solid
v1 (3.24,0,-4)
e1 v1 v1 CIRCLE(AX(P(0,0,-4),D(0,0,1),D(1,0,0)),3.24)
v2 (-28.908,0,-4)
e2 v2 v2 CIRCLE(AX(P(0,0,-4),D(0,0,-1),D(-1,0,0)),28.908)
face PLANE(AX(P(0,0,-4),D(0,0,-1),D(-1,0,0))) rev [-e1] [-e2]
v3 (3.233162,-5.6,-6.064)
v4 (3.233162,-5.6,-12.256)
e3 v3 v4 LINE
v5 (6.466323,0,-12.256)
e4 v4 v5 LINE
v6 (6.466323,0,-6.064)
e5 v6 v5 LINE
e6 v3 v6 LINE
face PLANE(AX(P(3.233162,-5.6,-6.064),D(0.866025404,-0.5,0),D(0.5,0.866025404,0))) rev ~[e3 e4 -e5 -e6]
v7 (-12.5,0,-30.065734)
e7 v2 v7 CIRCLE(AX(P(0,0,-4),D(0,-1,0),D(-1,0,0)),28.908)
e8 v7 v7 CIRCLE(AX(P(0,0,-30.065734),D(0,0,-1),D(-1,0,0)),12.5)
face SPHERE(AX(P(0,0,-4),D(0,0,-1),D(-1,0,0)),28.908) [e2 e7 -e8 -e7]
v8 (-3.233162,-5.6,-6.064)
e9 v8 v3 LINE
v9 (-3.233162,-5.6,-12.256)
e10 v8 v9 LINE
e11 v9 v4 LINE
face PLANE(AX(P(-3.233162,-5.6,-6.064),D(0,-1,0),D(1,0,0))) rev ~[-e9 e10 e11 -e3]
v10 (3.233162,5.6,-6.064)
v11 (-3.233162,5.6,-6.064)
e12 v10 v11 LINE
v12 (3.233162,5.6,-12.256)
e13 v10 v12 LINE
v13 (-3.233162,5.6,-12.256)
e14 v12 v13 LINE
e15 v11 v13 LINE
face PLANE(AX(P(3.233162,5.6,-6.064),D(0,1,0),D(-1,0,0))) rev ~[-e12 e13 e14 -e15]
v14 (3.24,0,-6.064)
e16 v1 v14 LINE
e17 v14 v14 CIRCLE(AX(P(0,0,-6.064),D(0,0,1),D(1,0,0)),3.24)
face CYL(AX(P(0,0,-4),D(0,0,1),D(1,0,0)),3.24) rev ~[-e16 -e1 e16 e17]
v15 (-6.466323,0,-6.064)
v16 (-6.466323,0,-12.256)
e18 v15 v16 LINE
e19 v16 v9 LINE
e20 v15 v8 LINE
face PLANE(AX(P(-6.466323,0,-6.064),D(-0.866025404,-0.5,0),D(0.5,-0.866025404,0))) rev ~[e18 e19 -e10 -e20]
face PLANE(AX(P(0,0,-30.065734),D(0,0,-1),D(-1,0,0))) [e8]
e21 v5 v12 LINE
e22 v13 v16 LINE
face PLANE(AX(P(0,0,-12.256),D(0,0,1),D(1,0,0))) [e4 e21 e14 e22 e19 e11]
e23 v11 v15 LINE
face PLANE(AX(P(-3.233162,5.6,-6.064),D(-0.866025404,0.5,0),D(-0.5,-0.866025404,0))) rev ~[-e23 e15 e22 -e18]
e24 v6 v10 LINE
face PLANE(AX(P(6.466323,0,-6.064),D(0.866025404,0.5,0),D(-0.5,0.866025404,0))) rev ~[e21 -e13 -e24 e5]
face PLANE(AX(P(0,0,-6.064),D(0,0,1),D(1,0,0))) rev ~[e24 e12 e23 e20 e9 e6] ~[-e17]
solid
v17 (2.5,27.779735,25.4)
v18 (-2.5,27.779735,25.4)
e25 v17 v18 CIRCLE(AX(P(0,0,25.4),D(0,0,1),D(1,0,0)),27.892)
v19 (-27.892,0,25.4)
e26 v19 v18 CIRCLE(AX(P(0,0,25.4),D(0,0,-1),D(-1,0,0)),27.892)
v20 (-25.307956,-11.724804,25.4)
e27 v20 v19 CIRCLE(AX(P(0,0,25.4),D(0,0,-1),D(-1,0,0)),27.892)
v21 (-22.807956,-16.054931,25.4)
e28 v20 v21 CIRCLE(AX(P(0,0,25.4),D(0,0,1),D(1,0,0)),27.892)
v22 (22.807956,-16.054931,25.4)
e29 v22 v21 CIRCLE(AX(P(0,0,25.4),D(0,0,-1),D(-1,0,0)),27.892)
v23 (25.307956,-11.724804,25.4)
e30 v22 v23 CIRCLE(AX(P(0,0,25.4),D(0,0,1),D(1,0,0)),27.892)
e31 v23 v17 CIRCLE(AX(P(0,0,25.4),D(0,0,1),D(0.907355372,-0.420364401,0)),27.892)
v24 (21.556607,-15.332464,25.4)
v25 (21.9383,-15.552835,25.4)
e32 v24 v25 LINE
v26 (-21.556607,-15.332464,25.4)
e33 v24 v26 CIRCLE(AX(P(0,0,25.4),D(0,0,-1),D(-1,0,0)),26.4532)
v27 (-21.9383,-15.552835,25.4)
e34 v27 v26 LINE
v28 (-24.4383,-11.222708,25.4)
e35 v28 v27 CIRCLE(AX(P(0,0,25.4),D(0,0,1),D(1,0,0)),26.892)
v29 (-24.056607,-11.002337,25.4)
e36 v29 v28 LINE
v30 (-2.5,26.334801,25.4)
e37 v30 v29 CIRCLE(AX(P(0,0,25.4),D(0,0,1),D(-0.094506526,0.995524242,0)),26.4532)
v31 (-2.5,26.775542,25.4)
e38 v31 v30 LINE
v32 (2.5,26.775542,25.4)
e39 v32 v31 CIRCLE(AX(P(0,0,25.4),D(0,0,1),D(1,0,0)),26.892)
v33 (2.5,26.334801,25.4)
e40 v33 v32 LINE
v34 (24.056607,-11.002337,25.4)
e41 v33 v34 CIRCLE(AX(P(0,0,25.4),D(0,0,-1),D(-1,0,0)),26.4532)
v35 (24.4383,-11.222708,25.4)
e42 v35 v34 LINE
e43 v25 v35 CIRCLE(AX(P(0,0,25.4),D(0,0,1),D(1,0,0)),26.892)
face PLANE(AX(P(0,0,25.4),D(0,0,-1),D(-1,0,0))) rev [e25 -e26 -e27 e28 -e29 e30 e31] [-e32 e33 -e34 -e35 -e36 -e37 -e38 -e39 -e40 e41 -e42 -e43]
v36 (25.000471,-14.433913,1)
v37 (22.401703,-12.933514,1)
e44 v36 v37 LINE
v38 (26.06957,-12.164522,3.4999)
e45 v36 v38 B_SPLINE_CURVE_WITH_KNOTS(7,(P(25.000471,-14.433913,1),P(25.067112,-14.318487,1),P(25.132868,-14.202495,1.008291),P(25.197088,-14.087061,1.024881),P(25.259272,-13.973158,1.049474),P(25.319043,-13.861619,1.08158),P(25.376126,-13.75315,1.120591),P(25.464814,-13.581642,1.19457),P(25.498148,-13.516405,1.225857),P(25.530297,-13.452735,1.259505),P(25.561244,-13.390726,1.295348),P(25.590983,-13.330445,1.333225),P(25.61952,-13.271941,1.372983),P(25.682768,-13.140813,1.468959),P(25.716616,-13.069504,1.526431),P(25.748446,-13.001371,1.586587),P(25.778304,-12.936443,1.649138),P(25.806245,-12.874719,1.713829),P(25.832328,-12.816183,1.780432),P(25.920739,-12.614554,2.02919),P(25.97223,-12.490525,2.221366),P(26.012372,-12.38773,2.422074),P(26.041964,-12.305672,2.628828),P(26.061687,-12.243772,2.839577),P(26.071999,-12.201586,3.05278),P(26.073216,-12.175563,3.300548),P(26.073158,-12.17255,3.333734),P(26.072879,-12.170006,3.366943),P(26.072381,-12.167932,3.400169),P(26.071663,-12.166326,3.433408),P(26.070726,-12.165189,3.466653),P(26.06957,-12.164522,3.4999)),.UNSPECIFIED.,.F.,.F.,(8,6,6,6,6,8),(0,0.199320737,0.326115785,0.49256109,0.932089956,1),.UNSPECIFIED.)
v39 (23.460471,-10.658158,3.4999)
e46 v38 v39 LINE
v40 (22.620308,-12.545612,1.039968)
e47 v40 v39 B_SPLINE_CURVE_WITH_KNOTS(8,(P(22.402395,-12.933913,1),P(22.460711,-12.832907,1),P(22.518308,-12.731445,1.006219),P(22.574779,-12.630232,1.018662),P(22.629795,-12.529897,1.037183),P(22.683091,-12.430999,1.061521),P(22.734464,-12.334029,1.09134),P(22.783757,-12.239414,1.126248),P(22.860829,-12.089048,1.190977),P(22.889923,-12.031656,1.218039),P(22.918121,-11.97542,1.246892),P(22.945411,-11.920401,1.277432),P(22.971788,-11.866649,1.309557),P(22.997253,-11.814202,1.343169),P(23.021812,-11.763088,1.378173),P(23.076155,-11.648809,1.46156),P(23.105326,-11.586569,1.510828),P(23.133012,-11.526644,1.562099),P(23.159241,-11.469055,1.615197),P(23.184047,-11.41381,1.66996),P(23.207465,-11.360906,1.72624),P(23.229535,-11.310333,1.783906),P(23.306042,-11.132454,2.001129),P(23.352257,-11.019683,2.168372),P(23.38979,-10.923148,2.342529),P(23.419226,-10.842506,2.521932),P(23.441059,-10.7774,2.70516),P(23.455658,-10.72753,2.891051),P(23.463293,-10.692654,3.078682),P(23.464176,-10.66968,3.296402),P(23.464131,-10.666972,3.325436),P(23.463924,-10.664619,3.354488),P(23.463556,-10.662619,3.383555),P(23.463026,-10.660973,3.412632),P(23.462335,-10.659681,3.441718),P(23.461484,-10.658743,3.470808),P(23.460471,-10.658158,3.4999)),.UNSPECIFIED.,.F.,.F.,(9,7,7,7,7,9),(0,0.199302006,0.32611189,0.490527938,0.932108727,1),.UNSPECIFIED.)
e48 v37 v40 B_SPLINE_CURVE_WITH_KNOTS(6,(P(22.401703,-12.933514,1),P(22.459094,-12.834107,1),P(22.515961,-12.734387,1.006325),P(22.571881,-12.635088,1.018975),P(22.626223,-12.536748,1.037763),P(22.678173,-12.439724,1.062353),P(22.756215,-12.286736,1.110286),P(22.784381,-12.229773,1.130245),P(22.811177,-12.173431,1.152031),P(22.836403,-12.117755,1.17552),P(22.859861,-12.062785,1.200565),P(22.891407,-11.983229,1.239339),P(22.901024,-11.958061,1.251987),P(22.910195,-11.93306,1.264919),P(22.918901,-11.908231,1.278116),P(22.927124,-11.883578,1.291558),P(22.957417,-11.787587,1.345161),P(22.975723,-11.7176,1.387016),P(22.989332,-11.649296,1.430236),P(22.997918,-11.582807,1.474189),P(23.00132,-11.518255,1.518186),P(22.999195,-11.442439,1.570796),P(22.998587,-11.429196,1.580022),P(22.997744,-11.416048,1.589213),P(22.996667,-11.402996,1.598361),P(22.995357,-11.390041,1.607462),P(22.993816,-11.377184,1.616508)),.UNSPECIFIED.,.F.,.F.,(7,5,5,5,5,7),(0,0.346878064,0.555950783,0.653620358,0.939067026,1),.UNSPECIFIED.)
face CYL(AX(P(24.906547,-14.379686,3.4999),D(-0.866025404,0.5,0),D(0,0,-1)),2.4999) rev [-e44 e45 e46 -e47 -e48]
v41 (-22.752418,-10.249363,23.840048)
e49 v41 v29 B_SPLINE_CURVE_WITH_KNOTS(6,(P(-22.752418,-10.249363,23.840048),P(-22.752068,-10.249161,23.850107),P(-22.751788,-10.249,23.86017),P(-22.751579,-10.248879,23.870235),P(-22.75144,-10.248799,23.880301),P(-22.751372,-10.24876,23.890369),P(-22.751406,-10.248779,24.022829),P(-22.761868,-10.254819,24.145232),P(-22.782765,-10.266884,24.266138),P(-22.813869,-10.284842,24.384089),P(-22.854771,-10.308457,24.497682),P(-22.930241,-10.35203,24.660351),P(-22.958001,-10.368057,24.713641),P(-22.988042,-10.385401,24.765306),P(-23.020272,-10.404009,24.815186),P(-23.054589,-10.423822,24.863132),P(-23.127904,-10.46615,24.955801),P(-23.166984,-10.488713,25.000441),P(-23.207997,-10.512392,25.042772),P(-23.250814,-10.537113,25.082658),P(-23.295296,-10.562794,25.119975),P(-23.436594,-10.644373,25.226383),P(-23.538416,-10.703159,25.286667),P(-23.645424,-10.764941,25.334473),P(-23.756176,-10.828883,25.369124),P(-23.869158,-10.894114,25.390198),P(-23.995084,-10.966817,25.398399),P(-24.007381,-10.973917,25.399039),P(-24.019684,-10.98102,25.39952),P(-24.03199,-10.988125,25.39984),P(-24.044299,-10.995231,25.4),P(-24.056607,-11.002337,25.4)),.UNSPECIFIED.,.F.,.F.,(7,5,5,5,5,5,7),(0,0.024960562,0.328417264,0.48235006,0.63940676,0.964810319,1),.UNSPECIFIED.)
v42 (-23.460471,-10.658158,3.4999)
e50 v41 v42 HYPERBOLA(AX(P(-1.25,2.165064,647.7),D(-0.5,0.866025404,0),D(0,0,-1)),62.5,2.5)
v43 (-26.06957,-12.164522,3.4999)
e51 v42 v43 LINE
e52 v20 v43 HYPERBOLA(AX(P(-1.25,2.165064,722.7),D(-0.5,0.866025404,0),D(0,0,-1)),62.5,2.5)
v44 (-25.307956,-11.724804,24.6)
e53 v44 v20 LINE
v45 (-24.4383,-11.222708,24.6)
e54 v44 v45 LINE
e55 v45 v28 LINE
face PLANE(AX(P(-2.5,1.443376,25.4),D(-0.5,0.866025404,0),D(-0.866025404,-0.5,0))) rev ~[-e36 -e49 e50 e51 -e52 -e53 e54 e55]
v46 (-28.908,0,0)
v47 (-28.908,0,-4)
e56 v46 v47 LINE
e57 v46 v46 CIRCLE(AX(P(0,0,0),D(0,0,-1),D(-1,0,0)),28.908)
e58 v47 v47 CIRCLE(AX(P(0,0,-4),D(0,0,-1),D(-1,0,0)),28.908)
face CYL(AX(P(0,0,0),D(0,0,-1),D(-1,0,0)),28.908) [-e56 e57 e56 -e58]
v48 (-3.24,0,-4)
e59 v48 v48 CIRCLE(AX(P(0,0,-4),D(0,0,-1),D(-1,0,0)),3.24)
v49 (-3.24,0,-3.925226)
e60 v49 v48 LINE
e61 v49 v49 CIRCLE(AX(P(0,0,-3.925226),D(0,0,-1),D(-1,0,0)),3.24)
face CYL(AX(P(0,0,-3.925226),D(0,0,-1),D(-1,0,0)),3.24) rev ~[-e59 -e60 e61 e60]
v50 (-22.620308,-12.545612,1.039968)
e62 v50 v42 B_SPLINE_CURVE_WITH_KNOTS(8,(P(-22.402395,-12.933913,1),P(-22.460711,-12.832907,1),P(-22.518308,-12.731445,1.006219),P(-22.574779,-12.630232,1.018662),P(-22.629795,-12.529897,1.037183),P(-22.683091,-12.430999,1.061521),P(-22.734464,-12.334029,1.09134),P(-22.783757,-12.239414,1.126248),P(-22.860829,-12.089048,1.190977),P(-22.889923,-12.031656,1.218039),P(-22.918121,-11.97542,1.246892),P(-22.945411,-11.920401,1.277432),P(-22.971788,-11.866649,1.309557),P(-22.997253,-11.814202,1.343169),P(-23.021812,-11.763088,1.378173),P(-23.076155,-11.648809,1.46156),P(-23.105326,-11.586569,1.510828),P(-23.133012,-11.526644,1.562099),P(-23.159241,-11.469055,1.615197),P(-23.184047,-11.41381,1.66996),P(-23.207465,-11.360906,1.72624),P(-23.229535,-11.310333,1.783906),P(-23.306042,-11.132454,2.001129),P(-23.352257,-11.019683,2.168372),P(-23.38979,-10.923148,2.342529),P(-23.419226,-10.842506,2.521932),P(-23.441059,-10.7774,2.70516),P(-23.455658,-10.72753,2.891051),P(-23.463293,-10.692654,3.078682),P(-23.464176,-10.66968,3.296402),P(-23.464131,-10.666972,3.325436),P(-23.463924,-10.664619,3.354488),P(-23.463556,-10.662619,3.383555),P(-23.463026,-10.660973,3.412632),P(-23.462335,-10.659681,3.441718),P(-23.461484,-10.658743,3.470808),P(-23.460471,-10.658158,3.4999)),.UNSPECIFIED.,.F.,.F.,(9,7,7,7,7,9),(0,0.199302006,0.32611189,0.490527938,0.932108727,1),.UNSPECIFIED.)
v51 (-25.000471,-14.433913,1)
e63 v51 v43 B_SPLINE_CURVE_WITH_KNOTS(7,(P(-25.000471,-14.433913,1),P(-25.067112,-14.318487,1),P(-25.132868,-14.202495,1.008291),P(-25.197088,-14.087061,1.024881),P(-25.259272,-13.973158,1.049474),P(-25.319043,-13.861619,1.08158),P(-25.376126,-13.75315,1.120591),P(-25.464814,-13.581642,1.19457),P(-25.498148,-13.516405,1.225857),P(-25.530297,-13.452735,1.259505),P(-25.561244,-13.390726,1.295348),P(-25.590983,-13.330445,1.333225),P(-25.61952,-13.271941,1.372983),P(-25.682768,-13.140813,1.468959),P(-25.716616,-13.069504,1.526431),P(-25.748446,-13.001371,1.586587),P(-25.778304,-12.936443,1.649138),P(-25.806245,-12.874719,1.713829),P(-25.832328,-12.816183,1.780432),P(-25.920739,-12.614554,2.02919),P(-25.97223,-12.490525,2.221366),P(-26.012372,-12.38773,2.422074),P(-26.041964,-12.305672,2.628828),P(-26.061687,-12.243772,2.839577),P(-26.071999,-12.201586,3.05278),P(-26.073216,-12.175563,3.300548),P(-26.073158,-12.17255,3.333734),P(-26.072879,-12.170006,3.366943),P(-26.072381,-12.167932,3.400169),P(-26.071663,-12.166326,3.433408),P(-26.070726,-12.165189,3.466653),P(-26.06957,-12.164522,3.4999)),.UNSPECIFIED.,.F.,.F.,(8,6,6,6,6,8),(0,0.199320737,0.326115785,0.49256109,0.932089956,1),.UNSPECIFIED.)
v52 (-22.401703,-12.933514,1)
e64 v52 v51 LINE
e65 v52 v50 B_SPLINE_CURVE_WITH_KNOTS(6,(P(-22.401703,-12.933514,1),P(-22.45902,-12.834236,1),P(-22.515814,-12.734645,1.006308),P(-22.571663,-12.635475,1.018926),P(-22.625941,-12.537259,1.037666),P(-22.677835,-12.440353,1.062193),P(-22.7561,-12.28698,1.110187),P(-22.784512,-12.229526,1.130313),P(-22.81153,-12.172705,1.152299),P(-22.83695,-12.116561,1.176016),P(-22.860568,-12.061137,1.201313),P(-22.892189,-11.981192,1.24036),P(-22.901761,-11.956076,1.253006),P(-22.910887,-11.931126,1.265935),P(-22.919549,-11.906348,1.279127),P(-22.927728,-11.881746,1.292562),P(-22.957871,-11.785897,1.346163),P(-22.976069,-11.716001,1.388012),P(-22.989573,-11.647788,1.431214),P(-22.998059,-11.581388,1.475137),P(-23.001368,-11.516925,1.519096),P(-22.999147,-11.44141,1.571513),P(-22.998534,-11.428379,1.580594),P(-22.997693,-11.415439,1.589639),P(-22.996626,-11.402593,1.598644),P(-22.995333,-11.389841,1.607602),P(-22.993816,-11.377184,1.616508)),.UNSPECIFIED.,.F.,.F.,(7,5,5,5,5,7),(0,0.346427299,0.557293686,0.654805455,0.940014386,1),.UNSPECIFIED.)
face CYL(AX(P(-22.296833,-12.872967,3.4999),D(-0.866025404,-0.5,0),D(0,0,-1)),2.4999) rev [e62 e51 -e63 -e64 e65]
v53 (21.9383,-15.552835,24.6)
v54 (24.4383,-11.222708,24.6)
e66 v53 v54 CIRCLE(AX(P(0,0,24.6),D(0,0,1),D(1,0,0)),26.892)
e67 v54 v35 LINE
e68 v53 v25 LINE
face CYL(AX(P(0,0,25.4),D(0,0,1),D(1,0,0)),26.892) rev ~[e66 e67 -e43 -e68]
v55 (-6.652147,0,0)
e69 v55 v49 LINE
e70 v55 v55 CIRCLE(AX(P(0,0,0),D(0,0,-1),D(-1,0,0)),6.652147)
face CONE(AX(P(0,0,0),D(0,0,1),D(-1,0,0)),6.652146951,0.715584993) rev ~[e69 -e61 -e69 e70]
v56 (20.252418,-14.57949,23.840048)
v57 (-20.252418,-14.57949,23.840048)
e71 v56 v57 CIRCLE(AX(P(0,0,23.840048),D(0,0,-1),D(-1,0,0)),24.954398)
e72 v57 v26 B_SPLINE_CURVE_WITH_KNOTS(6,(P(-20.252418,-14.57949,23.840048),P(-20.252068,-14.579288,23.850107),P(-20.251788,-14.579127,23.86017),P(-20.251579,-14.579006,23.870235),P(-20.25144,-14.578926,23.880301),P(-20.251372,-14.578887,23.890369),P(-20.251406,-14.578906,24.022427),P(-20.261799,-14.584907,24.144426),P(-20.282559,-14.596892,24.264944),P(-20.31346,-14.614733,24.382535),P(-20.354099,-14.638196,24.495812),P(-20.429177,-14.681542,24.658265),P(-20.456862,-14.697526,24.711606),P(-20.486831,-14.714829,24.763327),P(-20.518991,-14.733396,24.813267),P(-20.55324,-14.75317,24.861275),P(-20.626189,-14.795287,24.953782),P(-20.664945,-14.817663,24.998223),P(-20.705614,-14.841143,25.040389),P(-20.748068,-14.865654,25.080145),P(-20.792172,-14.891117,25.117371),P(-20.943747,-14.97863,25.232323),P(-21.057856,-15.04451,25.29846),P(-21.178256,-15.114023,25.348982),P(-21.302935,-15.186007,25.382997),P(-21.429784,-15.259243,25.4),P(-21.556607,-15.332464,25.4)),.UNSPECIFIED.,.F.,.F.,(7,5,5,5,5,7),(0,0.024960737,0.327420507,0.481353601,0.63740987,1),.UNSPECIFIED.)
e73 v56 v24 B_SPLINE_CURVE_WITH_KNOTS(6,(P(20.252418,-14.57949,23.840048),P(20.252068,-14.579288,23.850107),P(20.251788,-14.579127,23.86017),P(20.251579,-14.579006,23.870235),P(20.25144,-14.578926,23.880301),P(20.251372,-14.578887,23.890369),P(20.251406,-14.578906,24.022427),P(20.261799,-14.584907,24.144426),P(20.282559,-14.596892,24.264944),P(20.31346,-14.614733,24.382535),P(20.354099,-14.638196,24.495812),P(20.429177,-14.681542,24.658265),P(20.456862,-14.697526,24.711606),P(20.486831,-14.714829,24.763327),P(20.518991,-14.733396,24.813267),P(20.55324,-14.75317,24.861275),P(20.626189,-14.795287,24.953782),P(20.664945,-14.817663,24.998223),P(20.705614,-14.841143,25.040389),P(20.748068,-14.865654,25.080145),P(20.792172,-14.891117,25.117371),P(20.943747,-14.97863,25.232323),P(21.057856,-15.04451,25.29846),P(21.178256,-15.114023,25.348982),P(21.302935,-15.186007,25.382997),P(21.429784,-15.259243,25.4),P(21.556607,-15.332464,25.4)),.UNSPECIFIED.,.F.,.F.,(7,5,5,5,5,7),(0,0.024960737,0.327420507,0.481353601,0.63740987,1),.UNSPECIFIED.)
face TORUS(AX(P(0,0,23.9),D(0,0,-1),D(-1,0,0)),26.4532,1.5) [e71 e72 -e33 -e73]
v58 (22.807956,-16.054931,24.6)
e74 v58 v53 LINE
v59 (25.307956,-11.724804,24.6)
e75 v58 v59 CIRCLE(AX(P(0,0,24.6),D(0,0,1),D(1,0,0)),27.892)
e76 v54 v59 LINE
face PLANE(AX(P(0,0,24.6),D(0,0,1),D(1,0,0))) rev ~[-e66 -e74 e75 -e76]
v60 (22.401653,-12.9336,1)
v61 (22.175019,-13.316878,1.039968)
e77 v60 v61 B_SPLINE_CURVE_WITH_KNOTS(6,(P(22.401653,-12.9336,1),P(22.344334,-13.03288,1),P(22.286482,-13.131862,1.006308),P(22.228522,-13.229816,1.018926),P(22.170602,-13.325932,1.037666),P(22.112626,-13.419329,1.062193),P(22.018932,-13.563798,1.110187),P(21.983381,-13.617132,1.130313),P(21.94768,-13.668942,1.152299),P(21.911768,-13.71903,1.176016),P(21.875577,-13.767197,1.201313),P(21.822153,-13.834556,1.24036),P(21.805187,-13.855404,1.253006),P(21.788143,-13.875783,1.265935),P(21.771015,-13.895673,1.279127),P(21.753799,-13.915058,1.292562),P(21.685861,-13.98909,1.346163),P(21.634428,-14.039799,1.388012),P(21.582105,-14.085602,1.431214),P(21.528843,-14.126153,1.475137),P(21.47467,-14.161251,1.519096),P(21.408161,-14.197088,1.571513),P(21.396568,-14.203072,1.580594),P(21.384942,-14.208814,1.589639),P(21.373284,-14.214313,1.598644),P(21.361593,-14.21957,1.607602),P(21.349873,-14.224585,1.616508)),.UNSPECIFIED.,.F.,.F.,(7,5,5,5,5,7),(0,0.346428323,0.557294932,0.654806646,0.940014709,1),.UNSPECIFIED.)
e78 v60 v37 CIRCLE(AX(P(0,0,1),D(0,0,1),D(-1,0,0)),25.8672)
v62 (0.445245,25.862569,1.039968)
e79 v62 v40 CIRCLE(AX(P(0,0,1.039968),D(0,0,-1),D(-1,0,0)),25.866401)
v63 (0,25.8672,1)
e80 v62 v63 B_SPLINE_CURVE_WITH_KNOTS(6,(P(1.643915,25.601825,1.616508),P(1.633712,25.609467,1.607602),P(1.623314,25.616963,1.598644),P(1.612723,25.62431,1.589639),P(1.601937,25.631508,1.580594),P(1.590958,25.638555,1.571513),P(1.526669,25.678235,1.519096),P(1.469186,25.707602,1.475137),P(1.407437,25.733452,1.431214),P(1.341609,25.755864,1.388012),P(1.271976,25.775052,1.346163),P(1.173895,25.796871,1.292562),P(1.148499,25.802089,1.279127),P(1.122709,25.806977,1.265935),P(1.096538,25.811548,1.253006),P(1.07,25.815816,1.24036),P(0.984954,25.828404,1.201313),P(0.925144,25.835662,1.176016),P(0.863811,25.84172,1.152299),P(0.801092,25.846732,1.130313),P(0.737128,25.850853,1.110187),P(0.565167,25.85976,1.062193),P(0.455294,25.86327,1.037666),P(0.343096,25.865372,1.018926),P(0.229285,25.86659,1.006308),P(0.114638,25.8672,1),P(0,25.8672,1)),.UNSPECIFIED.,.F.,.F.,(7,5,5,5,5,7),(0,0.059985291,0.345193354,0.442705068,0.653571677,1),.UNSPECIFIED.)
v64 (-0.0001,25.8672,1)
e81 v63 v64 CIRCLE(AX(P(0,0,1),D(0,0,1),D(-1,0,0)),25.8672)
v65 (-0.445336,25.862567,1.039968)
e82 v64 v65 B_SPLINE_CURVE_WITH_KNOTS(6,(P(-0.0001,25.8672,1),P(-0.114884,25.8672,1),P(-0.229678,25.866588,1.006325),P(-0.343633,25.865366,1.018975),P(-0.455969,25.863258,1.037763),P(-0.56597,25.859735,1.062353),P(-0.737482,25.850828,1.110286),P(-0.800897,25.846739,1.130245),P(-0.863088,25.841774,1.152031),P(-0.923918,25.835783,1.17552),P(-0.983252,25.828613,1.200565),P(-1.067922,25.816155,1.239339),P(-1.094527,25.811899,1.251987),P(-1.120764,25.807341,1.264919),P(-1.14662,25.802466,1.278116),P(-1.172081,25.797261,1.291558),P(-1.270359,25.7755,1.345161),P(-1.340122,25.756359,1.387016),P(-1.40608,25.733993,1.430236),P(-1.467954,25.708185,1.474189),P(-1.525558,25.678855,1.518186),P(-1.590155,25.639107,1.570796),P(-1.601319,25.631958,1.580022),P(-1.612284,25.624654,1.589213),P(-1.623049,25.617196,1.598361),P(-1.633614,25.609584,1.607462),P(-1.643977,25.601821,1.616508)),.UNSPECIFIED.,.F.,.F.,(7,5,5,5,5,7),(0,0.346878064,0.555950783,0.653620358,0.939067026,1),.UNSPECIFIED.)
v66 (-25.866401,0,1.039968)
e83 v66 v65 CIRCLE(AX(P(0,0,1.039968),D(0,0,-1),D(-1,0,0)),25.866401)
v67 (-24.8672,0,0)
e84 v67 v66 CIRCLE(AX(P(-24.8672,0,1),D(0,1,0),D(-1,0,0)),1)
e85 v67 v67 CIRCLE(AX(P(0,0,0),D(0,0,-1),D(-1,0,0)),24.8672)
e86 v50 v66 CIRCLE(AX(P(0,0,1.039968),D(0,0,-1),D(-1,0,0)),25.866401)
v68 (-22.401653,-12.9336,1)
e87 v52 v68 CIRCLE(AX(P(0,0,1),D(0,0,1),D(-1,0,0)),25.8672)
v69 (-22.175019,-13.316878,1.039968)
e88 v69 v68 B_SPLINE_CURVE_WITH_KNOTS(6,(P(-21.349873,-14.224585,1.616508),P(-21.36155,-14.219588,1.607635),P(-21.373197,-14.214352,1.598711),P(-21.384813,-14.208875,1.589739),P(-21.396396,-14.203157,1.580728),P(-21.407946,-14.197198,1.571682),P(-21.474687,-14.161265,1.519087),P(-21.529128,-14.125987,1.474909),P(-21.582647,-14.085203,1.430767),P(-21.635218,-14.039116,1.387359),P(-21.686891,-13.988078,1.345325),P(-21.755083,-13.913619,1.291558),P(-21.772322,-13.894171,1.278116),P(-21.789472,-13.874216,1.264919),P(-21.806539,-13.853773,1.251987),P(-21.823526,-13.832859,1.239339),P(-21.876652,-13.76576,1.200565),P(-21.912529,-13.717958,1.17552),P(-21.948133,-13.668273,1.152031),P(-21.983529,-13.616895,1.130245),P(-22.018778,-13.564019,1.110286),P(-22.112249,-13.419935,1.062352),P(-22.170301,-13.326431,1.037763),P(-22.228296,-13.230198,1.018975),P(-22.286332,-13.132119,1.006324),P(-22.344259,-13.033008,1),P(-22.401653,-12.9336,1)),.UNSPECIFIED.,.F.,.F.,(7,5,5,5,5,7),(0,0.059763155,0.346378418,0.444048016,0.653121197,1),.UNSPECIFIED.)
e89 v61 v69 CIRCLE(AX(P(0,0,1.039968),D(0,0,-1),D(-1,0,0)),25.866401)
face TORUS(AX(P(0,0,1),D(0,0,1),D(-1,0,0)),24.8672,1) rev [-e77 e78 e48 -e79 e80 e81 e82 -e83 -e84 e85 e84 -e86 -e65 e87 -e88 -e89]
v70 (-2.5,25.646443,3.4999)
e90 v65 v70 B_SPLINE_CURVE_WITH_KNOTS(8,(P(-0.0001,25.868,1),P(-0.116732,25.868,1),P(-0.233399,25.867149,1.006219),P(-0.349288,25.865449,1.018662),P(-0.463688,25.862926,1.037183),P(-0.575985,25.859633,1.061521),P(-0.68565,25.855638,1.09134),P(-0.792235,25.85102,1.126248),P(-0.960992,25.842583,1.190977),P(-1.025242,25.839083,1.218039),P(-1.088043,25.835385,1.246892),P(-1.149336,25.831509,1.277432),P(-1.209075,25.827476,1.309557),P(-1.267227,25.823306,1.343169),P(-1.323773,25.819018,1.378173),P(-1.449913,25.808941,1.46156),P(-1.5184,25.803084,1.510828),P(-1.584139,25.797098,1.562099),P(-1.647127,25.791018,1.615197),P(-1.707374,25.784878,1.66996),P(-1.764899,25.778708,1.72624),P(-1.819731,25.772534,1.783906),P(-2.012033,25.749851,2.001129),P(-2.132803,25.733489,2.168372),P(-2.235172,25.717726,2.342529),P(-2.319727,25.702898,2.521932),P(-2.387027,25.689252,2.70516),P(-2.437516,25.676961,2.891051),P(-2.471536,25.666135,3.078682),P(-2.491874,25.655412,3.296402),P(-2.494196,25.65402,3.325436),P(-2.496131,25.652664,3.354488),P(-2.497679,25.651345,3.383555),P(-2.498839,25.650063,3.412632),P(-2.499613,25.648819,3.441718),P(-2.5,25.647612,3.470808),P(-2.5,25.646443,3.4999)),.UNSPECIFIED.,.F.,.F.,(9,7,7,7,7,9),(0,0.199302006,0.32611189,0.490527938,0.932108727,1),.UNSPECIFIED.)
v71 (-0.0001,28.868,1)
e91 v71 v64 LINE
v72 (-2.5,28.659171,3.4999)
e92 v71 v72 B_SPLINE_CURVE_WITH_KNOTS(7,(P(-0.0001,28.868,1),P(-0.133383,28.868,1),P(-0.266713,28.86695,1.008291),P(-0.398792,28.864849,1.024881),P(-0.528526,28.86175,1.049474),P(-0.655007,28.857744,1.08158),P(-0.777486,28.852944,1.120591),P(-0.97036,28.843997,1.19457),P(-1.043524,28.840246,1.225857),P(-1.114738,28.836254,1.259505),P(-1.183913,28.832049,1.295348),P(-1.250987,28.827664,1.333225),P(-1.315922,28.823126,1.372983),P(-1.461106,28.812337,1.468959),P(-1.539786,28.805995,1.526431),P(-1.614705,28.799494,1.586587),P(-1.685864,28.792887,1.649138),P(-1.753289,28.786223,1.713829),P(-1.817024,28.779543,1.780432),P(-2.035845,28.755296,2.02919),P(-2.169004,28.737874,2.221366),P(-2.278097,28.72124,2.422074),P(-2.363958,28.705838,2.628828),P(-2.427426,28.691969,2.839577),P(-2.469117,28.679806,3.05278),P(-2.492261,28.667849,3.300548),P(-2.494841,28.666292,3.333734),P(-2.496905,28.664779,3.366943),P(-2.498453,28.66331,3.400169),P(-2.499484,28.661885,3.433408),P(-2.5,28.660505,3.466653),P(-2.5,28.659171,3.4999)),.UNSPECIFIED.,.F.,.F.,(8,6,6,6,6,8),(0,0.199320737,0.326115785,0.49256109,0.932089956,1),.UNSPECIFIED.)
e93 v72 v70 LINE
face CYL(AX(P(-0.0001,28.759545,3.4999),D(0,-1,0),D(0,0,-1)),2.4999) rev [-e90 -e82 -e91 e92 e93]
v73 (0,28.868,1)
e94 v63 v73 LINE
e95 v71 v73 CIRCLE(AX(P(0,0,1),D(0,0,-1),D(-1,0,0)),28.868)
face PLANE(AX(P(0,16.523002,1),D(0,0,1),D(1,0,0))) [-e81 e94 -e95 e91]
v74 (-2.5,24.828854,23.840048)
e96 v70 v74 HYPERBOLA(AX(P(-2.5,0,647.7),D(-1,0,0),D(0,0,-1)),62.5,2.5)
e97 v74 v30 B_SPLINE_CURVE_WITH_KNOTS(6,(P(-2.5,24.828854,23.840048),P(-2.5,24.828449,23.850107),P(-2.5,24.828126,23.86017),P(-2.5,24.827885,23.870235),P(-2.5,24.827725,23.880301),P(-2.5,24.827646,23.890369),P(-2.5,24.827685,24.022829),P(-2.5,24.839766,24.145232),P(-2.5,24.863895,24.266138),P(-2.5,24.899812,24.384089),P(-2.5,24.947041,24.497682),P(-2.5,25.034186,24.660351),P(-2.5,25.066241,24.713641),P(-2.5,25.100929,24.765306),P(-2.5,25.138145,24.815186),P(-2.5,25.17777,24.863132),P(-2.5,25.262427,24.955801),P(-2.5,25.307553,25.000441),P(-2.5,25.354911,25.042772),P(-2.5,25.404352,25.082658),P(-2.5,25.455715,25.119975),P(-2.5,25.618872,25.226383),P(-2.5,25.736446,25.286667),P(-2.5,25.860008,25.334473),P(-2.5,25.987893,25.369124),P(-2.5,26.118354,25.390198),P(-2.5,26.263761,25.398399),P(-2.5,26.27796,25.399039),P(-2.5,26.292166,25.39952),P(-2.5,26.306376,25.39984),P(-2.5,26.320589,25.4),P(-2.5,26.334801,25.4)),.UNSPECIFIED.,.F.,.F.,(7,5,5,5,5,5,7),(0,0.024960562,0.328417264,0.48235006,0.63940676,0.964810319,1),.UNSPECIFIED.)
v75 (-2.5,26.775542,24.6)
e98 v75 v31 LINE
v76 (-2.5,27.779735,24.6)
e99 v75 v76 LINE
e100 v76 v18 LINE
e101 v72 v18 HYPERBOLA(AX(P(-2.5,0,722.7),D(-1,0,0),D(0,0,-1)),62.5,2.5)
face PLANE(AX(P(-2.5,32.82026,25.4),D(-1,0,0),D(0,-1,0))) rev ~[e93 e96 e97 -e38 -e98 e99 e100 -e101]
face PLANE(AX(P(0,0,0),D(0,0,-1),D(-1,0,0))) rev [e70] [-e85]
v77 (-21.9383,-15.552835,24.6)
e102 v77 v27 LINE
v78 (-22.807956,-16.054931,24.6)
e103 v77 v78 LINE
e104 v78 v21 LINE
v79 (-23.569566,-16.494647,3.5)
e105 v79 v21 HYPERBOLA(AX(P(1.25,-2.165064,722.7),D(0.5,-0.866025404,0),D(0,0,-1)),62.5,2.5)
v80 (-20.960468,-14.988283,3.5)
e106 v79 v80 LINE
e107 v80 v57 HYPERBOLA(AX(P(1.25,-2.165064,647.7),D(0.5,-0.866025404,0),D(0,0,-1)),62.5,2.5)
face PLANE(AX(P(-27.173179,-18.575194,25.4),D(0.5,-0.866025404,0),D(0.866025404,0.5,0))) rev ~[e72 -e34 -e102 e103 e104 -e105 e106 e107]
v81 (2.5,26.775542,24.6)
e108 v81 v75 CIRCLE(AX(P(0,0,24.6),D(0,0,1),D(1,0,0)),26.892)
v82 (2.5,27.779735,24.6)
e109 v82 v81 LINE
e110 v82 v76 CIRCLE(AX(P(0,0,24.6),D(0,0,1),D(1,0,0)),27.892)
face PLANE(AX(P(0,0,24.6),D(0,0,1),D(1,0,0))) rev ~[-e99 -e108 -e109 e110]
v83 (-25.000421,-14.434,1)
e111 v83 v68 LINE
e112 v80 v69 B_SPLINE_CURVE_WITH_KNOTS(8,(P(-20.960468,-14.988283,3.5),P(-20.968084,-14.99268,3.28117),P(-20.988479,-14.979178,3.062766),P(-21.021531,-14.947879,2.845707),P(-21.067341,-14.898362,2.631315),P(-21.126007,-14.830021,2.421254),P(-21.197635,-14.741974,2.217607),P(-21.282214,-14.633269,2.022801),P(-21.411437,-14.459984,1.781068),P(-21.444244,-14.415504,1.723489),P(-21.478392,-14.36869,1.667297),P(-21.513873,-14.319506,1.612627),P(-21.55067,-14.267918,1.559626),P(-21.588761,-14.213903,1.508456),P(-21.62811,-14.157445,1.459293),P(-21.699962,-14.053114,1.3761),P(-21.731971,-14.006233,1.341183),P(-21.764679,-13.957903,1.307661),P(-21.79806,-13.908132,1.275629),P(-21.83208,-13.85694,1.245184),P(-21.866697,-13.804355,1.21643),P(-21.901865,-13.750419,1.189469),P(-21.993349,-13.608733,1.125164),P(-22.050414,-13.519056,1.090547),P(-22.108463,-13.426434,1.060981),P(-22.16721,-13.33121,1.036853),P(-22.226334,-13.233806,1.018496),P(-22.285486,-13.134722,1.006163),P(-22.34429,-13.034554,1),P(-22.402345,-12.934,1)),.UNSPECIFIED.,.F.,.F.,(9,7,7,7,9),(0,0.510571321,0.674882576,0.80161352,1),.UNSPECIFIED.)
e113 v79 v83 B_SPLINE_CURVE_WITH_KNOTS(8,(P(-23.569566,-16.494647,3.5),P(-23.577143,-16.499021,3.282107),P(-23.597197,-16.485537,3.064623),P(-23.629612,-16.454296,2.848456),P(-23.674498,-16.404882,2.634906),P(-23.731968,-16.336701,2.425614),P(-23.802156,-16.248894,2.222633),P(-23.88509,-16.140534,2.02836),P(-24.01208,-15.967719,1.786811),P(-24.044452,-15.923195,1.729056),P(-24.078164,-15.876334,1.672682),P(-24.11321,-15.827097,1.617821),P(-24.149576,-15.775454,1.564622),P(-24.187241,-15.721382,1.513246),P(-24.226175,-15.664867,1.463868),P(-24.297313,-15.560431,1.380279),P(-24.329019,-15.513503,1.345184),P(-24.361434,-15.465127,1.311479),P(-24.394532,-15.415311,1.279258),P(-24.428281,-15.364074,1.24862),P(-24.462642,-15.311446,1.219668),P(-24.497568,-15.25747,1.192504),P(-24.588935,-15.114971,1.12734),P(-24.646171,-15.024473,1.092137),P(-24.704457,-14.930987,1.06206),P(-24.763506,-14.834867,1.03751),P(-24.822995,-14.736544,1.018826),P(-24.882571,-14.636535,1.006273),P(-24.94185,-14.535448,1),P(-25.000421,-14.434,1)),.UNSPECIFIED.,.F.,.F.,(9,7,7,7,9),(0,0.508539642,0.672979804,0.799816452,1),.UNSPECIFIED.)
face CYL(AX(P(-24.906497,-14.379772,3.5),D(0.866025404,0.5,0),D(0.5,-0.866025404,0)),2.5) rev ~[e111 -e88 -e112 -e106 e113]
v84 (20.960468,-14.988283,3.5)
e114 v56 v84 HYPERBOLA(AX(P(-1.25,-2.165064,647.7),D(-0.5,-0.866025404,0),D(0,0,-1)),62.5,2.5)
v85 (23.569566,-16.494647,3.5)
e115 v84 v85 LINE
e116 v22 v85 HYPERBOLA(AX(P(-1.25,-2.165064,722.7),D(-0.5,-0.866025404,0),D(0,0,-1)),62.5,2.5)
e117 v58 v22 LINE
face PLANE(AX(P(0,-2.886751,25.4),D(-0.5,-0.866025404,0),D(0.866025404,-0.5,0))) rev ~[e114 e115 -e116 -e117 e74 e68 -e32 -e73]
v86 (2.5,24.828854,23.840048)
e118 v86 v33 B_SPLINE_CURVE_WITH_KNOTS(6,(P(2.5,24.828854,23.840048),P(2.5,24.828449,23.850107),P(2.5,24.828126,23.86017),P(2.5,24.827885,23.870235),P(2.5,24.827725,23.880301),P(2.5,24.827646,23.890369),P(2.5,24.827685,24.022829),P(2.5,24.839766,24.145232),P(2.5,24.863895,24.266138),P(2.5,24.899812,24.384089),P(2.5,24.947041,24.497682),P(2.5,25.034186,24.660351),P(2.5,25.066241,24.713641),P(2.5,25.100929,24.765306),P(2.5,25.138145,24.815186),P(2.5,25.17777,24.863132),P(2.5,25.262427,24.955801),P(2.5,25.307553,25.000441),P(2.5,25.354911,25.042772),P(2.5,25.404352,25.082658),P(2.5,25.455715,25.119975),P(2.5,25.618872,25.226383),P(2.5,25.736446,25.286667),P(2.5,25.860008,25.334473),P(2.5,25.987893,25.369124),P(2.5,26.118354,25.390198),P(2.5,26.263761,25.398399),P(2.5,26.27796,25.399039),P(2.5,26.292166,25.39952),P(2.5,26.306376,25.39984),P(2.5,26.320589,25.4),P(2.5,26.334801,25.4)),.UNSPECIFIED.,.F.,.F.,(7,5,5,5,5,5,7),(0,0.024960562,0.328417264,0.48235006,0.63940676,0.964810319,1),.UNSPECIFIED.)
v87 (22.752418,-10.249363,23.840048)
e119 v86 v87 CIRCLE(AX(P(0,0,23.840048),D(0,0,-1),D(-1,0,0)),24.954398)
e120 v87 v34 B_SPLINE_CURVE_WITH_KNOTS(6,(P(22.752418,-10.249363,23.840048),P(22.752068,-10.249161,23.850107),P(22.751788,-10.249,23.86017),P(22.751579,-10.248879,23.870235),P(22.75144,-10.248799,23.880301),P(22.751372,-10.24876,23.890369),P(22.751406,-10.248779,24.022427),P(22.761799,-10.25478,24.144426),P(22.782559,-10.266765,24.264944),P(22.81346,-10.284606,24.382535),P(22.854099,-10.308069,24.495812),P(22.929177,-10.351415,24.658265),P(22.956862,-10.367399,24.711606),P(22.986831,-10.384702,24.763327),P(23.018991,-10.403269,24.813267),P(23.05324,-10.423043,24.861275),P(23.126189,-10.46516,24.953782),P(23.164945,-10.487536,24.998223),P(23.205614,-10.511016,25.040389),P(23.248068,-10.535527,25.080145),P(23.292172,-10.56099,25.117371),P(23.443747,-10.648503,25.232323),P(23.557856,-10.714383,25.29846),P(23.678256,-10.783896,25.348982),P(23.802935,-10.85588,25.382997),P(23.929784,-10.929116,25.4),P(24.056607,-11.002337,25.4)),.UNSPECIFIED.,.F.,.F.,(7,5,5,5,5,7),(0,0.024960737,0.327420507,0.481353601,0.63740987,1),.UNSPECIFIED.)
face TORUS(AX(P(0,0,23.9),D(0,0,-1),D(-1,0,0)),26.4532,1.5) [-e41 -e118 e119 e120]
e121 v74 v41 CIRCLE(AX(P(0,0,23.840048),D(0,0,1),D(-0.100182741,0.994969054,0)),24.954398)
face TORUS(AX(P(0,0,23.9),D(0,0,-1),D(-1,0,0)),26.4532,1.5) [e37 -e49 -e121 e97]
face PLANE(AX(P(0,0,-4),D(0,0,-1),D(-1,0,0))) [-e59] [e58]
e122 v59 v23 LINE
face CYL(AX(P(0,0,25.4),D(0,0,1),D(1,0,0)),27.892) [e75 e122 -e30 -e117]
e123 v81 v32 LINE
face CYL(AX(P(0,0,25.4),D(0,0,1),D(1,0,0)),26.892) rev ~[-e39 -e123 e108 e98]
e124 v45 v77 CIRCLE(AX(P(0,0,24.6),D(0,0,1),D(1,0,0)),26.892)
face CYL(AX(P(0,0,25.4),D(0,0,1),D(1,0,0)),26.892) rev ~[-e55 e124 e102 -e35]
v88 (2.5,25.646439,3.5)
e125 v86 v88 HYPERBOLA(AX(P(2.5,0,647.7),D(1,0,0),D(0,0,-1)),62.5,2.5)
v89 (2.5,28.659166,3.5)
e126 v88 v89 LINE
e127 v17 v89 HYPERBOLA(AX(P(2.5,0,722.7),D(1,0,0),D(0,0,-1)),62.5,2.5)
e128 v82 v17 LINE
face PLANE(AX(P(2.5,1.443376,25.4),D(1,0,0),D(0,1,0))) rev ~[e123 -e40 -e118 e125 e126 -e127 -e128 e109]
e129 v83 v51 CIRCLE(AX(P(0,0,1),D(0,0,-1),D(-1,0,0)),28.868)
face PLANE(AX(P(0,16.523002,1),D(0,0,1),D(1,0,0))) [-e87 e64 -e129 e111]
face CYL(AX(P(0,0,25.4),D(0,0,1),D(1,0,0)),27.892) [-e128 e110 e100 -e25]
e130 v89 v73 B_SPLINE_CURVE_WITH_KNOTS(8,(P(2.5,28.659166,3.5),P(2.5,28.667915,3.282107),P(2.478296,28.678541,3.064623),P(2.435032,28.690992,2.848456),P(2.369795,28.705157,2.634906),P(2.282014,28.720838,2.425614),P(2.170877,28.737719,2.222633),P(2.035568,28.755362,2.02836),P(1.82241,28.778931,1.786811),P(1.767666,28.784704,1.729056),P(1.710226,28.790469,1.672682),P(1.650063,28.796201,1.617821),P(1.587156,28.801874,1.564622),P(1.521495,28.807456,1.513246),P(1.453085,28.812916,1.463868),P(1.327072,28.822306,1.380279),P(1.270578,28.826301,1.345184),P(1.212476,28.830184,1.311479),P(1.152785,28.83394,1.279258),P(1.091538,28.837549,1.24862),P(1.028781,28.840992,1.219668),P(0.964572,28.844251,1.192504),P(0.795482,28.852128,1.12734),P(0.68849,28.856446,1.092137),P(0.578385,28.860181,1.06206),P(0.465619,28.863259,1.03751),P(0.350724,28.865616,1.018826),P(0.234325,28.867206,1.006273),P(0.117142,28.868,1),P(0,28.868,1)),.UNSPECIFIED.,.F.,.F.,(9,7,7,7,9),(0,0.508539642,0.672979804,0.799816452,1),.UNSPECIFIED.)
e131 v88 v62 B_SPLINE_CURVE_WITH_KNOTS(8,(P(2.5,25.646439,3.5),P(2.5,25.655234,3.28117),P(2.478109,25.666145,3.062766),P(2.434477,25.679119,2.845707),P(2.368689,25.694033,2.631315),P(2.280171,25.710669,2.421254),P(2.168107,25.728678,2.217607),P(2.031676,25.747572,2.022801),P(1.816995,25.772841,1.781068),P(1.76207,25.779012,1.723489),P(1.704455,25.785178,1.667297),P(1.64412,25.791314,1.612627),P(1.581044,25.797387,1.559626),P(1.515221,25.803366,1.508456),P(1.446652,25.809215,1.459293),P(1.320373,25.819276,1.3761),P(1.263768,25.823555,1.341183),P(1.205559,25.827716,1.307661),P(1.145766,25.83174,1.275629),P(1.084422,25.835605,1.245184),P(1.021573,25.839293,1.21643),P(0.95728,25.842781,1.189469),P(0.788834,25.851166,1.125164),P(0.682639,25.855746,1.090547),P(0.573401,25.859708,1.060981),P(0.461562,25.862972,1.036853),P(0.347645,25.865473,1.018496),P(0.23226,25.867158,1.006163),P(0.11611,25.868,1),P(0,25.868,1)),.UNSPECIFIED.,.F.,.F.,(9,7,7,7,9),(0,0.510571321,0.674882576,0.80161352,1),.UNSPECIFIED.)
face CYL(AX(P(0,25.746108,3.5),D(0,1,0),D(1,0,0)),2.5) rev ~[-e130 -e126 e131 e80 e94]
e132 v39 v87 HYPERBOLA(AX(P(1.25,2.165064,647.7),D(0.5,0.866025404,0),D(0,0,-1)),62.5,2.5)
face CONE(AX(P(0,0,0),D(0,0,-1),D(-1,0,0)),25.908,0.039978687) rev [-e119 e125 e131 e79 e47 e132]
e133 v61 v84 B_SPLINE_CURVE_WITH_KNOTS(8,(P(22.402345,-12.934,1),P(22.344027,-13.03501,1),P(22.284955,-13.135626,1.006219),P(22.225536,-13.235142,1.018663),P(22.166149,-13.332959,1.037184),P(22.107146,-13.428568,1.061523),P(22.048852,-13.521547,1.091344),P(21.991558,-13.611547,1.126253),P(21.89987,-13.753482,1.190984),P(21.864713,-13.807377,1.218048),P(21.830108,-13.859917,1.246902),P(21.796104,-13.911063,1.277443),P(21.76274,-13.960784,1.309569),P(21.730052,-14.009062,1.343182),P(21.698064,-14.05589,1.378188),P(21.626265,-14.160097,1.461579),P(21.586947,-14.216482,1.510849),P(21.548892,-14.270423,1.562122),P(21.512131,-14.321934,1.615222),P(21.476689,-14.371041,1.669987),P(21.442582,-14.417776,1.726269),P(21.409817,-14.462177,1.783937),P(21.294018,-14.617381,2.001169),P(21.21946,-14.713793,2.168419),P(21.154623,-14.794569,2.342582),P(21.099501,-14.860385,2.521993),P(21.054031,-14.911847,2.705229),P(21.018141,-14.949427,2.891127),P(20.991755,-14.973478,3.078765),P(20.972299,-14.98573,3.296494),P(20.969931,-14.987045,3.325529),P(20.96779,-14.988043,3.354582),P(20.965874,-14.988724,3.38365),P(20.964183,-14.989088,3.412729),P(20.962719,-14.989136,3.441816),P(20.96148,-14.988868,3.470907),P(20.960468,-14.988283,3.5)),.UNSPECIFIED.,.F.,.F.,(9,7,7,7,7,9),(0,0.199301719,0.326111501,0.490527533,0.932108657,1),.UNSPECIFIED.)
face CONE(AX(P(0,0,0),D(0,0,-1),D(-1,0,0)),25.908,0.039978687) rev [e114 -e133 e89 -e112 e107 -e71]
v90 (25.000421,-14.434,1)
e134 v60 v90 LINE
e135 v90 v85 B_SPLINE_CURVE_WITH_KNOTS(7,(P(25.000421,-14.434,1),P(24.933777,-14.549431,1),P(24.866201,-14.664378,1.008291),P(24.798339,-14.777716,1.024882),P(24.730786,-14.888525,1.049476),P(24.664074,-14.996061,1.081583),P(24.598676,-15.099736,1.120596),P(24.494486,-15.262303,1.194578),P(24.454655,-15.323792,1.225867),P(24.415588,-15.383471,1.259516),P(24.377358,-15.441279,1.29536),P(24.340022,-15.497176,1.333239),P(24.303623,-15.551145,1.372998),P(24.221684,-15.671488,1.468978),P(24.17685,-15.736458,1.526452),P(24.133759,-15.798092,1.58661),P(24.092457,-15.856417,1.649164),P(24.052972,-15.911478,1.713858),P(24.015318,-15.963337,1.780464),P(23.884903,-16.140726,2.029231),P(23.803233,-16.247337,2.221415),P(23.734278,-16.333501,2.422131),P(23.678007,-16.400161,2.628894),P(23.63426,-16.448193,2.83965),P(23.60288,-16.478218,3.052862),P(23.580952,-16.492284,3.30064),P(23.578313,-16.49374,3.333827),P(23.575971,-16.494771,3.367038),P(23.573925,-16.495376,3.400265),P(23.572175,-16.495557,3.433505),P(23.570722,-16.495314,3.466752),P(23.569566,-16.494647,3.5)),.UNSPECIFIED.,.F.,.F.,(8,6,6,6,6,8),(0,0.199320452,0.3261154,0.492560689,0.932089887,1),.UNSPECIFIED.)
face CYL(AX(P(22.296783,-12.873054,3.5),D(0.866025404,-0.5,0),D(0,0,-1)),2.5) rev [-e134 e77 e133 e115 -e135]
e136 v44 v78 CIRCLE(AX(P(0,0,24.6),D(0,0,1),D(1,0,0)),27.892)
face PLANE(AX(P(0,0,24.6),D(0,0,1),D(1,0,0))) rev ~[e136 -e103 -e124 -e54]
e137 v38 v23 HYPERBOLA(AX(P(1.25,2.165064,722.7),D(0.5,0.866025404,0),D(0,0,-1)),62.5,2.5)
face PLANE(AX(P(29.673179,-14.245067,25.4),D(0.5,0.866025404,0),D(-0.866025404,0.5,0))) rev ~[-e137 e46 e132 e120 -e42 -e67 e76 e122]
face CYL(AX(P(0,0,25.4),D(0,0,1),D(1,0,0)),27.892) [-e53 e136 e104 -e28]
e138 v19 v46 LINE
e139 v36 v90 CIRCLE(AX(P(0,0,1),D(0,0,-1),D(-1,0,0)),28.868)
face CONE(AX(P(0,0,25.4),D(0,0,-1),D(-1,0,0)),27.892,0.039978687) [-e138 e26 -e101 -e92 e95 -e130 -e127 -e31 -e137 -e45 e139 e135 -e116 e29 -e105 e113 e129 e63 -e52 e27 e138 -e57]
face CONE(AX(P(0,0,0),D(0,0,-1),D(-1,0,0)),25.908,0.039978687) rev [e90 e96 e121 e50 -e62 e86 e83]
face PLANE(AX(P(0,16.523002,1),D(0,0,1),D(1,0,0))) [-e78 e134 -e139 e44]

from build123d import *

# Parameters (mm, degrees)
F2_R      = 1
F3_R      = 1.5
F5_DEPTH  = 24.4
F6_F1_R   = 2.5
F6_F2_R   = 2.5
F6_F3_R   = 2.5
F6_F4_R   = 2.4999
F6_F5_R   = 2.4999
F6_F6_R   = 2.4999
F8_W      = 6.6521469513
F8_H      = 11.3077862186
F13_DEPTH = 6.192
F16_R     = 3.24
F17_DEPTH = 2.064
F7_R      = 27.892
F7_R_2    = 26.892
F18_DEPTH = 0.8


# Not quite as in the source:
# - a fillet or chamfer is up to 0.001 mm smaller than in the source, because OpenCascade refuses the exact size


with BuildPart() as f1:
    # F0 (on Front) → F1 (revolve)
    with BuildSketch(Plane.XZ):
        Polygon((0, -4), (0, 0), (-25.908, 0), (-24.892, 25.4), (-27.892, 25.4), (-28.908, 0), (-28.908, -4), align=None)
    revolve(axis=Axis((0, 0, -2), (0, 0, -1)))

    # F2
    f2_edges = [f1.edges().sort_by_distance(p)[0] for p in [
        (25.908, 0, 0),
    ]]
    fillet(f2_edges, radius=F2_R)

    # F3
    f3_edges = [f1.edges().sort_by_distance(p)[0] for p in [
        (24.892, 0, 25.4),
    ]]
    fillet(f3_edges, radius=F3_R)

    # F4 (on face) → F5 (cut)
    with BuildSketch(Plane.XY.offset(25.4)):
        Polygon((2.5, 32.8202601522), (-2.5, 32.8202601522), (-2.5, 1.443375673), (-1.25, 2.1650635095), (0, 0), (1.25, 2.1650635095), (2.5, 1.443375673), align=None)
        Polygon((-1.25, 2.1650635095), (-2.5, 1.443375673), (-2.5, 0), (0, 0), align=None)
        Polygon((-2.5, 0), (-2.5, 1.443375673), (-29.6731790506, -14.2450665666), (-27.1731790506, -18.5751935856), (0, -2.8867513459), (-1.25, -2.1650635095), (0, 0), align=None)
        Polygon((29.6731790506, -14.2450665666), (2.5, 1.443375673), (2.5, 0), (0, 0), (1.25, -2.1650635095), (0, -2.8867513459), (27.1731790506, -18.5751935856), align=None)
        Polygon((2.5, 0), (2.5, 1.443375673), (1.25, 2.1650635095), (0, 0), align=None)
        Polygon((1.25, -2.1650635095), (0, 0), (-1.25, -2.1650635095), (0, -2.8867513459), align=None)
    extrude(amount=-F5_DEPTH, mode=Mode.SUBTRACT)

    # F6: fillet of radius 2.5 on 6 edges, made by hand

    # F6_f1
    f6_f1_edges = [f1.edges().sort_by_distance(p)[0] for p in [
        (-22.351639831, -15.7914766192, 1),
    ]]
    fillet(f6_f1_edges, radius=F6_F1_R)

    # F6_f2
    f6_f2_edges = [f1.edges().sort_by_distance(p)[0] for p in [
        (2.5, 27.2528262195, 1),
    ]]
    fillet(f6_f2_edges, radius=F6_F2_R)

    # F6_f3
    f6_f3_edges = [f1.edges().sort_by_distance(p)[0] for p in [
        (22.351639831, -15.7914766192, 1),
    ]]
    fillet(f6_f3_edges, radius=F6_F3_R)

    # F6_f4 (radius 2.5 in the source; OpenCascade refuses exactly that, so slightly less here)
    f6_f4_edges = [f1.edges().sort_by_distance(p)[0] for p in [
        (-24.851639831, -11.4613496003, 1),
    ]]
    fillet(f6_f4_edges, radius=F6_F4_R)

    # F6_f5 (radius 2.5 in the source; OpenCascade refuses exactly that, so slightly less here)
    f6_f5_edges = [f1.edges().sort_by_distance(p)[0] for p in [
        (24.851639831, -11.4613496003, 1),
    ]]
    fillet(f6_f5_edges, radius=F6_F5_R)

    # F6_f6 (radius 2.5 in the source; OpenCascade refuses exactly that, so slightly less here)
    f6_f6_edges = [f1.edges().sort_by_distance(p)[0] for p in [
        (-2.5, 27.2528262195, 1),
    ]]
    fillet(f6_f6_edges, radius=F6_F6_R)

    # F8 (on Front) → F9 (revolve, cut)
    with BuildSketch(Plane.XZ):
        with Locations((-3.3260734756, 5.6538931093)):
            Rectangle(F8_W, F8_H)
        Polygon((0, -15.6807032946), (0, 0), (-6.6521469513, 0), (-3.24, -3.9252260535), (-3.24, -15.6807032946), (-3.175, -15.6807032946), align=None)
    revolve(axis=Axis((0, 0, -2.186458538), (0, 0, -1)), mode=Mode.SUBTRACT)

    # F7 (on face) → F18 (join)
    with BuildSketch(Plane.XY.offset(25.4)):
        Circle(F7_R)
        Circle(F7_R_2, mode=Mode.SUBTRACT)
    extrude(amount=-F18_DEPTH)


with BuildPart() as f11:
    # F10 (on Front) → F11 (revolve)
    with BuildSketch(Plane.XZ):
        with BuildLine():
            Line((0, -4), (-28.908, -4))
            ThreePointArc((-28.908, -4), (-24.4644892038, -19.40004), (-12.5, -30.0657335212))
            Line((-12.5, -30.0657335212), (0, -30.0657335212))
            Line((0, -30.0657335212), (0, -4))
        make_face()
    revolve(axis=Axis((0, 0, -17.0328667606), (0, 0, -1)))


with BuildPart() as f13:
    # F12 (on face) → F13 (new body)
    with BuildSketch(Plane.XY.offset(-4)):
        Polygon((3.2331615075, 5.6), (-3.2331615075, 5.6), (-6.4663230149, 0), (-3.2331615075, -5.6), (3.2331615075, -5.6), (6.4663230149, 0), align=None)
    extrude(amount=-F13_DEPTH)


with BuildPart() as f13_1:
    # F14: moved
    add(f13.part.moved(Location((0, 0, -2.064))))


with BuildPart() as f11_1:
    add(f11.part)

    # F15: cut F13
    add(f13_1.part, mode=Mode.SUBTRACT)

    # F16 (on face) → F17 (cut)
    with BuildSketch(Plane.XY.offset(-4)):
        Circle(F16_R)
    extrude(amount=-F17_DEPTH, mode=Mode.SUBTRACT)


solid = Compound([f1.part, f11_1.part])
